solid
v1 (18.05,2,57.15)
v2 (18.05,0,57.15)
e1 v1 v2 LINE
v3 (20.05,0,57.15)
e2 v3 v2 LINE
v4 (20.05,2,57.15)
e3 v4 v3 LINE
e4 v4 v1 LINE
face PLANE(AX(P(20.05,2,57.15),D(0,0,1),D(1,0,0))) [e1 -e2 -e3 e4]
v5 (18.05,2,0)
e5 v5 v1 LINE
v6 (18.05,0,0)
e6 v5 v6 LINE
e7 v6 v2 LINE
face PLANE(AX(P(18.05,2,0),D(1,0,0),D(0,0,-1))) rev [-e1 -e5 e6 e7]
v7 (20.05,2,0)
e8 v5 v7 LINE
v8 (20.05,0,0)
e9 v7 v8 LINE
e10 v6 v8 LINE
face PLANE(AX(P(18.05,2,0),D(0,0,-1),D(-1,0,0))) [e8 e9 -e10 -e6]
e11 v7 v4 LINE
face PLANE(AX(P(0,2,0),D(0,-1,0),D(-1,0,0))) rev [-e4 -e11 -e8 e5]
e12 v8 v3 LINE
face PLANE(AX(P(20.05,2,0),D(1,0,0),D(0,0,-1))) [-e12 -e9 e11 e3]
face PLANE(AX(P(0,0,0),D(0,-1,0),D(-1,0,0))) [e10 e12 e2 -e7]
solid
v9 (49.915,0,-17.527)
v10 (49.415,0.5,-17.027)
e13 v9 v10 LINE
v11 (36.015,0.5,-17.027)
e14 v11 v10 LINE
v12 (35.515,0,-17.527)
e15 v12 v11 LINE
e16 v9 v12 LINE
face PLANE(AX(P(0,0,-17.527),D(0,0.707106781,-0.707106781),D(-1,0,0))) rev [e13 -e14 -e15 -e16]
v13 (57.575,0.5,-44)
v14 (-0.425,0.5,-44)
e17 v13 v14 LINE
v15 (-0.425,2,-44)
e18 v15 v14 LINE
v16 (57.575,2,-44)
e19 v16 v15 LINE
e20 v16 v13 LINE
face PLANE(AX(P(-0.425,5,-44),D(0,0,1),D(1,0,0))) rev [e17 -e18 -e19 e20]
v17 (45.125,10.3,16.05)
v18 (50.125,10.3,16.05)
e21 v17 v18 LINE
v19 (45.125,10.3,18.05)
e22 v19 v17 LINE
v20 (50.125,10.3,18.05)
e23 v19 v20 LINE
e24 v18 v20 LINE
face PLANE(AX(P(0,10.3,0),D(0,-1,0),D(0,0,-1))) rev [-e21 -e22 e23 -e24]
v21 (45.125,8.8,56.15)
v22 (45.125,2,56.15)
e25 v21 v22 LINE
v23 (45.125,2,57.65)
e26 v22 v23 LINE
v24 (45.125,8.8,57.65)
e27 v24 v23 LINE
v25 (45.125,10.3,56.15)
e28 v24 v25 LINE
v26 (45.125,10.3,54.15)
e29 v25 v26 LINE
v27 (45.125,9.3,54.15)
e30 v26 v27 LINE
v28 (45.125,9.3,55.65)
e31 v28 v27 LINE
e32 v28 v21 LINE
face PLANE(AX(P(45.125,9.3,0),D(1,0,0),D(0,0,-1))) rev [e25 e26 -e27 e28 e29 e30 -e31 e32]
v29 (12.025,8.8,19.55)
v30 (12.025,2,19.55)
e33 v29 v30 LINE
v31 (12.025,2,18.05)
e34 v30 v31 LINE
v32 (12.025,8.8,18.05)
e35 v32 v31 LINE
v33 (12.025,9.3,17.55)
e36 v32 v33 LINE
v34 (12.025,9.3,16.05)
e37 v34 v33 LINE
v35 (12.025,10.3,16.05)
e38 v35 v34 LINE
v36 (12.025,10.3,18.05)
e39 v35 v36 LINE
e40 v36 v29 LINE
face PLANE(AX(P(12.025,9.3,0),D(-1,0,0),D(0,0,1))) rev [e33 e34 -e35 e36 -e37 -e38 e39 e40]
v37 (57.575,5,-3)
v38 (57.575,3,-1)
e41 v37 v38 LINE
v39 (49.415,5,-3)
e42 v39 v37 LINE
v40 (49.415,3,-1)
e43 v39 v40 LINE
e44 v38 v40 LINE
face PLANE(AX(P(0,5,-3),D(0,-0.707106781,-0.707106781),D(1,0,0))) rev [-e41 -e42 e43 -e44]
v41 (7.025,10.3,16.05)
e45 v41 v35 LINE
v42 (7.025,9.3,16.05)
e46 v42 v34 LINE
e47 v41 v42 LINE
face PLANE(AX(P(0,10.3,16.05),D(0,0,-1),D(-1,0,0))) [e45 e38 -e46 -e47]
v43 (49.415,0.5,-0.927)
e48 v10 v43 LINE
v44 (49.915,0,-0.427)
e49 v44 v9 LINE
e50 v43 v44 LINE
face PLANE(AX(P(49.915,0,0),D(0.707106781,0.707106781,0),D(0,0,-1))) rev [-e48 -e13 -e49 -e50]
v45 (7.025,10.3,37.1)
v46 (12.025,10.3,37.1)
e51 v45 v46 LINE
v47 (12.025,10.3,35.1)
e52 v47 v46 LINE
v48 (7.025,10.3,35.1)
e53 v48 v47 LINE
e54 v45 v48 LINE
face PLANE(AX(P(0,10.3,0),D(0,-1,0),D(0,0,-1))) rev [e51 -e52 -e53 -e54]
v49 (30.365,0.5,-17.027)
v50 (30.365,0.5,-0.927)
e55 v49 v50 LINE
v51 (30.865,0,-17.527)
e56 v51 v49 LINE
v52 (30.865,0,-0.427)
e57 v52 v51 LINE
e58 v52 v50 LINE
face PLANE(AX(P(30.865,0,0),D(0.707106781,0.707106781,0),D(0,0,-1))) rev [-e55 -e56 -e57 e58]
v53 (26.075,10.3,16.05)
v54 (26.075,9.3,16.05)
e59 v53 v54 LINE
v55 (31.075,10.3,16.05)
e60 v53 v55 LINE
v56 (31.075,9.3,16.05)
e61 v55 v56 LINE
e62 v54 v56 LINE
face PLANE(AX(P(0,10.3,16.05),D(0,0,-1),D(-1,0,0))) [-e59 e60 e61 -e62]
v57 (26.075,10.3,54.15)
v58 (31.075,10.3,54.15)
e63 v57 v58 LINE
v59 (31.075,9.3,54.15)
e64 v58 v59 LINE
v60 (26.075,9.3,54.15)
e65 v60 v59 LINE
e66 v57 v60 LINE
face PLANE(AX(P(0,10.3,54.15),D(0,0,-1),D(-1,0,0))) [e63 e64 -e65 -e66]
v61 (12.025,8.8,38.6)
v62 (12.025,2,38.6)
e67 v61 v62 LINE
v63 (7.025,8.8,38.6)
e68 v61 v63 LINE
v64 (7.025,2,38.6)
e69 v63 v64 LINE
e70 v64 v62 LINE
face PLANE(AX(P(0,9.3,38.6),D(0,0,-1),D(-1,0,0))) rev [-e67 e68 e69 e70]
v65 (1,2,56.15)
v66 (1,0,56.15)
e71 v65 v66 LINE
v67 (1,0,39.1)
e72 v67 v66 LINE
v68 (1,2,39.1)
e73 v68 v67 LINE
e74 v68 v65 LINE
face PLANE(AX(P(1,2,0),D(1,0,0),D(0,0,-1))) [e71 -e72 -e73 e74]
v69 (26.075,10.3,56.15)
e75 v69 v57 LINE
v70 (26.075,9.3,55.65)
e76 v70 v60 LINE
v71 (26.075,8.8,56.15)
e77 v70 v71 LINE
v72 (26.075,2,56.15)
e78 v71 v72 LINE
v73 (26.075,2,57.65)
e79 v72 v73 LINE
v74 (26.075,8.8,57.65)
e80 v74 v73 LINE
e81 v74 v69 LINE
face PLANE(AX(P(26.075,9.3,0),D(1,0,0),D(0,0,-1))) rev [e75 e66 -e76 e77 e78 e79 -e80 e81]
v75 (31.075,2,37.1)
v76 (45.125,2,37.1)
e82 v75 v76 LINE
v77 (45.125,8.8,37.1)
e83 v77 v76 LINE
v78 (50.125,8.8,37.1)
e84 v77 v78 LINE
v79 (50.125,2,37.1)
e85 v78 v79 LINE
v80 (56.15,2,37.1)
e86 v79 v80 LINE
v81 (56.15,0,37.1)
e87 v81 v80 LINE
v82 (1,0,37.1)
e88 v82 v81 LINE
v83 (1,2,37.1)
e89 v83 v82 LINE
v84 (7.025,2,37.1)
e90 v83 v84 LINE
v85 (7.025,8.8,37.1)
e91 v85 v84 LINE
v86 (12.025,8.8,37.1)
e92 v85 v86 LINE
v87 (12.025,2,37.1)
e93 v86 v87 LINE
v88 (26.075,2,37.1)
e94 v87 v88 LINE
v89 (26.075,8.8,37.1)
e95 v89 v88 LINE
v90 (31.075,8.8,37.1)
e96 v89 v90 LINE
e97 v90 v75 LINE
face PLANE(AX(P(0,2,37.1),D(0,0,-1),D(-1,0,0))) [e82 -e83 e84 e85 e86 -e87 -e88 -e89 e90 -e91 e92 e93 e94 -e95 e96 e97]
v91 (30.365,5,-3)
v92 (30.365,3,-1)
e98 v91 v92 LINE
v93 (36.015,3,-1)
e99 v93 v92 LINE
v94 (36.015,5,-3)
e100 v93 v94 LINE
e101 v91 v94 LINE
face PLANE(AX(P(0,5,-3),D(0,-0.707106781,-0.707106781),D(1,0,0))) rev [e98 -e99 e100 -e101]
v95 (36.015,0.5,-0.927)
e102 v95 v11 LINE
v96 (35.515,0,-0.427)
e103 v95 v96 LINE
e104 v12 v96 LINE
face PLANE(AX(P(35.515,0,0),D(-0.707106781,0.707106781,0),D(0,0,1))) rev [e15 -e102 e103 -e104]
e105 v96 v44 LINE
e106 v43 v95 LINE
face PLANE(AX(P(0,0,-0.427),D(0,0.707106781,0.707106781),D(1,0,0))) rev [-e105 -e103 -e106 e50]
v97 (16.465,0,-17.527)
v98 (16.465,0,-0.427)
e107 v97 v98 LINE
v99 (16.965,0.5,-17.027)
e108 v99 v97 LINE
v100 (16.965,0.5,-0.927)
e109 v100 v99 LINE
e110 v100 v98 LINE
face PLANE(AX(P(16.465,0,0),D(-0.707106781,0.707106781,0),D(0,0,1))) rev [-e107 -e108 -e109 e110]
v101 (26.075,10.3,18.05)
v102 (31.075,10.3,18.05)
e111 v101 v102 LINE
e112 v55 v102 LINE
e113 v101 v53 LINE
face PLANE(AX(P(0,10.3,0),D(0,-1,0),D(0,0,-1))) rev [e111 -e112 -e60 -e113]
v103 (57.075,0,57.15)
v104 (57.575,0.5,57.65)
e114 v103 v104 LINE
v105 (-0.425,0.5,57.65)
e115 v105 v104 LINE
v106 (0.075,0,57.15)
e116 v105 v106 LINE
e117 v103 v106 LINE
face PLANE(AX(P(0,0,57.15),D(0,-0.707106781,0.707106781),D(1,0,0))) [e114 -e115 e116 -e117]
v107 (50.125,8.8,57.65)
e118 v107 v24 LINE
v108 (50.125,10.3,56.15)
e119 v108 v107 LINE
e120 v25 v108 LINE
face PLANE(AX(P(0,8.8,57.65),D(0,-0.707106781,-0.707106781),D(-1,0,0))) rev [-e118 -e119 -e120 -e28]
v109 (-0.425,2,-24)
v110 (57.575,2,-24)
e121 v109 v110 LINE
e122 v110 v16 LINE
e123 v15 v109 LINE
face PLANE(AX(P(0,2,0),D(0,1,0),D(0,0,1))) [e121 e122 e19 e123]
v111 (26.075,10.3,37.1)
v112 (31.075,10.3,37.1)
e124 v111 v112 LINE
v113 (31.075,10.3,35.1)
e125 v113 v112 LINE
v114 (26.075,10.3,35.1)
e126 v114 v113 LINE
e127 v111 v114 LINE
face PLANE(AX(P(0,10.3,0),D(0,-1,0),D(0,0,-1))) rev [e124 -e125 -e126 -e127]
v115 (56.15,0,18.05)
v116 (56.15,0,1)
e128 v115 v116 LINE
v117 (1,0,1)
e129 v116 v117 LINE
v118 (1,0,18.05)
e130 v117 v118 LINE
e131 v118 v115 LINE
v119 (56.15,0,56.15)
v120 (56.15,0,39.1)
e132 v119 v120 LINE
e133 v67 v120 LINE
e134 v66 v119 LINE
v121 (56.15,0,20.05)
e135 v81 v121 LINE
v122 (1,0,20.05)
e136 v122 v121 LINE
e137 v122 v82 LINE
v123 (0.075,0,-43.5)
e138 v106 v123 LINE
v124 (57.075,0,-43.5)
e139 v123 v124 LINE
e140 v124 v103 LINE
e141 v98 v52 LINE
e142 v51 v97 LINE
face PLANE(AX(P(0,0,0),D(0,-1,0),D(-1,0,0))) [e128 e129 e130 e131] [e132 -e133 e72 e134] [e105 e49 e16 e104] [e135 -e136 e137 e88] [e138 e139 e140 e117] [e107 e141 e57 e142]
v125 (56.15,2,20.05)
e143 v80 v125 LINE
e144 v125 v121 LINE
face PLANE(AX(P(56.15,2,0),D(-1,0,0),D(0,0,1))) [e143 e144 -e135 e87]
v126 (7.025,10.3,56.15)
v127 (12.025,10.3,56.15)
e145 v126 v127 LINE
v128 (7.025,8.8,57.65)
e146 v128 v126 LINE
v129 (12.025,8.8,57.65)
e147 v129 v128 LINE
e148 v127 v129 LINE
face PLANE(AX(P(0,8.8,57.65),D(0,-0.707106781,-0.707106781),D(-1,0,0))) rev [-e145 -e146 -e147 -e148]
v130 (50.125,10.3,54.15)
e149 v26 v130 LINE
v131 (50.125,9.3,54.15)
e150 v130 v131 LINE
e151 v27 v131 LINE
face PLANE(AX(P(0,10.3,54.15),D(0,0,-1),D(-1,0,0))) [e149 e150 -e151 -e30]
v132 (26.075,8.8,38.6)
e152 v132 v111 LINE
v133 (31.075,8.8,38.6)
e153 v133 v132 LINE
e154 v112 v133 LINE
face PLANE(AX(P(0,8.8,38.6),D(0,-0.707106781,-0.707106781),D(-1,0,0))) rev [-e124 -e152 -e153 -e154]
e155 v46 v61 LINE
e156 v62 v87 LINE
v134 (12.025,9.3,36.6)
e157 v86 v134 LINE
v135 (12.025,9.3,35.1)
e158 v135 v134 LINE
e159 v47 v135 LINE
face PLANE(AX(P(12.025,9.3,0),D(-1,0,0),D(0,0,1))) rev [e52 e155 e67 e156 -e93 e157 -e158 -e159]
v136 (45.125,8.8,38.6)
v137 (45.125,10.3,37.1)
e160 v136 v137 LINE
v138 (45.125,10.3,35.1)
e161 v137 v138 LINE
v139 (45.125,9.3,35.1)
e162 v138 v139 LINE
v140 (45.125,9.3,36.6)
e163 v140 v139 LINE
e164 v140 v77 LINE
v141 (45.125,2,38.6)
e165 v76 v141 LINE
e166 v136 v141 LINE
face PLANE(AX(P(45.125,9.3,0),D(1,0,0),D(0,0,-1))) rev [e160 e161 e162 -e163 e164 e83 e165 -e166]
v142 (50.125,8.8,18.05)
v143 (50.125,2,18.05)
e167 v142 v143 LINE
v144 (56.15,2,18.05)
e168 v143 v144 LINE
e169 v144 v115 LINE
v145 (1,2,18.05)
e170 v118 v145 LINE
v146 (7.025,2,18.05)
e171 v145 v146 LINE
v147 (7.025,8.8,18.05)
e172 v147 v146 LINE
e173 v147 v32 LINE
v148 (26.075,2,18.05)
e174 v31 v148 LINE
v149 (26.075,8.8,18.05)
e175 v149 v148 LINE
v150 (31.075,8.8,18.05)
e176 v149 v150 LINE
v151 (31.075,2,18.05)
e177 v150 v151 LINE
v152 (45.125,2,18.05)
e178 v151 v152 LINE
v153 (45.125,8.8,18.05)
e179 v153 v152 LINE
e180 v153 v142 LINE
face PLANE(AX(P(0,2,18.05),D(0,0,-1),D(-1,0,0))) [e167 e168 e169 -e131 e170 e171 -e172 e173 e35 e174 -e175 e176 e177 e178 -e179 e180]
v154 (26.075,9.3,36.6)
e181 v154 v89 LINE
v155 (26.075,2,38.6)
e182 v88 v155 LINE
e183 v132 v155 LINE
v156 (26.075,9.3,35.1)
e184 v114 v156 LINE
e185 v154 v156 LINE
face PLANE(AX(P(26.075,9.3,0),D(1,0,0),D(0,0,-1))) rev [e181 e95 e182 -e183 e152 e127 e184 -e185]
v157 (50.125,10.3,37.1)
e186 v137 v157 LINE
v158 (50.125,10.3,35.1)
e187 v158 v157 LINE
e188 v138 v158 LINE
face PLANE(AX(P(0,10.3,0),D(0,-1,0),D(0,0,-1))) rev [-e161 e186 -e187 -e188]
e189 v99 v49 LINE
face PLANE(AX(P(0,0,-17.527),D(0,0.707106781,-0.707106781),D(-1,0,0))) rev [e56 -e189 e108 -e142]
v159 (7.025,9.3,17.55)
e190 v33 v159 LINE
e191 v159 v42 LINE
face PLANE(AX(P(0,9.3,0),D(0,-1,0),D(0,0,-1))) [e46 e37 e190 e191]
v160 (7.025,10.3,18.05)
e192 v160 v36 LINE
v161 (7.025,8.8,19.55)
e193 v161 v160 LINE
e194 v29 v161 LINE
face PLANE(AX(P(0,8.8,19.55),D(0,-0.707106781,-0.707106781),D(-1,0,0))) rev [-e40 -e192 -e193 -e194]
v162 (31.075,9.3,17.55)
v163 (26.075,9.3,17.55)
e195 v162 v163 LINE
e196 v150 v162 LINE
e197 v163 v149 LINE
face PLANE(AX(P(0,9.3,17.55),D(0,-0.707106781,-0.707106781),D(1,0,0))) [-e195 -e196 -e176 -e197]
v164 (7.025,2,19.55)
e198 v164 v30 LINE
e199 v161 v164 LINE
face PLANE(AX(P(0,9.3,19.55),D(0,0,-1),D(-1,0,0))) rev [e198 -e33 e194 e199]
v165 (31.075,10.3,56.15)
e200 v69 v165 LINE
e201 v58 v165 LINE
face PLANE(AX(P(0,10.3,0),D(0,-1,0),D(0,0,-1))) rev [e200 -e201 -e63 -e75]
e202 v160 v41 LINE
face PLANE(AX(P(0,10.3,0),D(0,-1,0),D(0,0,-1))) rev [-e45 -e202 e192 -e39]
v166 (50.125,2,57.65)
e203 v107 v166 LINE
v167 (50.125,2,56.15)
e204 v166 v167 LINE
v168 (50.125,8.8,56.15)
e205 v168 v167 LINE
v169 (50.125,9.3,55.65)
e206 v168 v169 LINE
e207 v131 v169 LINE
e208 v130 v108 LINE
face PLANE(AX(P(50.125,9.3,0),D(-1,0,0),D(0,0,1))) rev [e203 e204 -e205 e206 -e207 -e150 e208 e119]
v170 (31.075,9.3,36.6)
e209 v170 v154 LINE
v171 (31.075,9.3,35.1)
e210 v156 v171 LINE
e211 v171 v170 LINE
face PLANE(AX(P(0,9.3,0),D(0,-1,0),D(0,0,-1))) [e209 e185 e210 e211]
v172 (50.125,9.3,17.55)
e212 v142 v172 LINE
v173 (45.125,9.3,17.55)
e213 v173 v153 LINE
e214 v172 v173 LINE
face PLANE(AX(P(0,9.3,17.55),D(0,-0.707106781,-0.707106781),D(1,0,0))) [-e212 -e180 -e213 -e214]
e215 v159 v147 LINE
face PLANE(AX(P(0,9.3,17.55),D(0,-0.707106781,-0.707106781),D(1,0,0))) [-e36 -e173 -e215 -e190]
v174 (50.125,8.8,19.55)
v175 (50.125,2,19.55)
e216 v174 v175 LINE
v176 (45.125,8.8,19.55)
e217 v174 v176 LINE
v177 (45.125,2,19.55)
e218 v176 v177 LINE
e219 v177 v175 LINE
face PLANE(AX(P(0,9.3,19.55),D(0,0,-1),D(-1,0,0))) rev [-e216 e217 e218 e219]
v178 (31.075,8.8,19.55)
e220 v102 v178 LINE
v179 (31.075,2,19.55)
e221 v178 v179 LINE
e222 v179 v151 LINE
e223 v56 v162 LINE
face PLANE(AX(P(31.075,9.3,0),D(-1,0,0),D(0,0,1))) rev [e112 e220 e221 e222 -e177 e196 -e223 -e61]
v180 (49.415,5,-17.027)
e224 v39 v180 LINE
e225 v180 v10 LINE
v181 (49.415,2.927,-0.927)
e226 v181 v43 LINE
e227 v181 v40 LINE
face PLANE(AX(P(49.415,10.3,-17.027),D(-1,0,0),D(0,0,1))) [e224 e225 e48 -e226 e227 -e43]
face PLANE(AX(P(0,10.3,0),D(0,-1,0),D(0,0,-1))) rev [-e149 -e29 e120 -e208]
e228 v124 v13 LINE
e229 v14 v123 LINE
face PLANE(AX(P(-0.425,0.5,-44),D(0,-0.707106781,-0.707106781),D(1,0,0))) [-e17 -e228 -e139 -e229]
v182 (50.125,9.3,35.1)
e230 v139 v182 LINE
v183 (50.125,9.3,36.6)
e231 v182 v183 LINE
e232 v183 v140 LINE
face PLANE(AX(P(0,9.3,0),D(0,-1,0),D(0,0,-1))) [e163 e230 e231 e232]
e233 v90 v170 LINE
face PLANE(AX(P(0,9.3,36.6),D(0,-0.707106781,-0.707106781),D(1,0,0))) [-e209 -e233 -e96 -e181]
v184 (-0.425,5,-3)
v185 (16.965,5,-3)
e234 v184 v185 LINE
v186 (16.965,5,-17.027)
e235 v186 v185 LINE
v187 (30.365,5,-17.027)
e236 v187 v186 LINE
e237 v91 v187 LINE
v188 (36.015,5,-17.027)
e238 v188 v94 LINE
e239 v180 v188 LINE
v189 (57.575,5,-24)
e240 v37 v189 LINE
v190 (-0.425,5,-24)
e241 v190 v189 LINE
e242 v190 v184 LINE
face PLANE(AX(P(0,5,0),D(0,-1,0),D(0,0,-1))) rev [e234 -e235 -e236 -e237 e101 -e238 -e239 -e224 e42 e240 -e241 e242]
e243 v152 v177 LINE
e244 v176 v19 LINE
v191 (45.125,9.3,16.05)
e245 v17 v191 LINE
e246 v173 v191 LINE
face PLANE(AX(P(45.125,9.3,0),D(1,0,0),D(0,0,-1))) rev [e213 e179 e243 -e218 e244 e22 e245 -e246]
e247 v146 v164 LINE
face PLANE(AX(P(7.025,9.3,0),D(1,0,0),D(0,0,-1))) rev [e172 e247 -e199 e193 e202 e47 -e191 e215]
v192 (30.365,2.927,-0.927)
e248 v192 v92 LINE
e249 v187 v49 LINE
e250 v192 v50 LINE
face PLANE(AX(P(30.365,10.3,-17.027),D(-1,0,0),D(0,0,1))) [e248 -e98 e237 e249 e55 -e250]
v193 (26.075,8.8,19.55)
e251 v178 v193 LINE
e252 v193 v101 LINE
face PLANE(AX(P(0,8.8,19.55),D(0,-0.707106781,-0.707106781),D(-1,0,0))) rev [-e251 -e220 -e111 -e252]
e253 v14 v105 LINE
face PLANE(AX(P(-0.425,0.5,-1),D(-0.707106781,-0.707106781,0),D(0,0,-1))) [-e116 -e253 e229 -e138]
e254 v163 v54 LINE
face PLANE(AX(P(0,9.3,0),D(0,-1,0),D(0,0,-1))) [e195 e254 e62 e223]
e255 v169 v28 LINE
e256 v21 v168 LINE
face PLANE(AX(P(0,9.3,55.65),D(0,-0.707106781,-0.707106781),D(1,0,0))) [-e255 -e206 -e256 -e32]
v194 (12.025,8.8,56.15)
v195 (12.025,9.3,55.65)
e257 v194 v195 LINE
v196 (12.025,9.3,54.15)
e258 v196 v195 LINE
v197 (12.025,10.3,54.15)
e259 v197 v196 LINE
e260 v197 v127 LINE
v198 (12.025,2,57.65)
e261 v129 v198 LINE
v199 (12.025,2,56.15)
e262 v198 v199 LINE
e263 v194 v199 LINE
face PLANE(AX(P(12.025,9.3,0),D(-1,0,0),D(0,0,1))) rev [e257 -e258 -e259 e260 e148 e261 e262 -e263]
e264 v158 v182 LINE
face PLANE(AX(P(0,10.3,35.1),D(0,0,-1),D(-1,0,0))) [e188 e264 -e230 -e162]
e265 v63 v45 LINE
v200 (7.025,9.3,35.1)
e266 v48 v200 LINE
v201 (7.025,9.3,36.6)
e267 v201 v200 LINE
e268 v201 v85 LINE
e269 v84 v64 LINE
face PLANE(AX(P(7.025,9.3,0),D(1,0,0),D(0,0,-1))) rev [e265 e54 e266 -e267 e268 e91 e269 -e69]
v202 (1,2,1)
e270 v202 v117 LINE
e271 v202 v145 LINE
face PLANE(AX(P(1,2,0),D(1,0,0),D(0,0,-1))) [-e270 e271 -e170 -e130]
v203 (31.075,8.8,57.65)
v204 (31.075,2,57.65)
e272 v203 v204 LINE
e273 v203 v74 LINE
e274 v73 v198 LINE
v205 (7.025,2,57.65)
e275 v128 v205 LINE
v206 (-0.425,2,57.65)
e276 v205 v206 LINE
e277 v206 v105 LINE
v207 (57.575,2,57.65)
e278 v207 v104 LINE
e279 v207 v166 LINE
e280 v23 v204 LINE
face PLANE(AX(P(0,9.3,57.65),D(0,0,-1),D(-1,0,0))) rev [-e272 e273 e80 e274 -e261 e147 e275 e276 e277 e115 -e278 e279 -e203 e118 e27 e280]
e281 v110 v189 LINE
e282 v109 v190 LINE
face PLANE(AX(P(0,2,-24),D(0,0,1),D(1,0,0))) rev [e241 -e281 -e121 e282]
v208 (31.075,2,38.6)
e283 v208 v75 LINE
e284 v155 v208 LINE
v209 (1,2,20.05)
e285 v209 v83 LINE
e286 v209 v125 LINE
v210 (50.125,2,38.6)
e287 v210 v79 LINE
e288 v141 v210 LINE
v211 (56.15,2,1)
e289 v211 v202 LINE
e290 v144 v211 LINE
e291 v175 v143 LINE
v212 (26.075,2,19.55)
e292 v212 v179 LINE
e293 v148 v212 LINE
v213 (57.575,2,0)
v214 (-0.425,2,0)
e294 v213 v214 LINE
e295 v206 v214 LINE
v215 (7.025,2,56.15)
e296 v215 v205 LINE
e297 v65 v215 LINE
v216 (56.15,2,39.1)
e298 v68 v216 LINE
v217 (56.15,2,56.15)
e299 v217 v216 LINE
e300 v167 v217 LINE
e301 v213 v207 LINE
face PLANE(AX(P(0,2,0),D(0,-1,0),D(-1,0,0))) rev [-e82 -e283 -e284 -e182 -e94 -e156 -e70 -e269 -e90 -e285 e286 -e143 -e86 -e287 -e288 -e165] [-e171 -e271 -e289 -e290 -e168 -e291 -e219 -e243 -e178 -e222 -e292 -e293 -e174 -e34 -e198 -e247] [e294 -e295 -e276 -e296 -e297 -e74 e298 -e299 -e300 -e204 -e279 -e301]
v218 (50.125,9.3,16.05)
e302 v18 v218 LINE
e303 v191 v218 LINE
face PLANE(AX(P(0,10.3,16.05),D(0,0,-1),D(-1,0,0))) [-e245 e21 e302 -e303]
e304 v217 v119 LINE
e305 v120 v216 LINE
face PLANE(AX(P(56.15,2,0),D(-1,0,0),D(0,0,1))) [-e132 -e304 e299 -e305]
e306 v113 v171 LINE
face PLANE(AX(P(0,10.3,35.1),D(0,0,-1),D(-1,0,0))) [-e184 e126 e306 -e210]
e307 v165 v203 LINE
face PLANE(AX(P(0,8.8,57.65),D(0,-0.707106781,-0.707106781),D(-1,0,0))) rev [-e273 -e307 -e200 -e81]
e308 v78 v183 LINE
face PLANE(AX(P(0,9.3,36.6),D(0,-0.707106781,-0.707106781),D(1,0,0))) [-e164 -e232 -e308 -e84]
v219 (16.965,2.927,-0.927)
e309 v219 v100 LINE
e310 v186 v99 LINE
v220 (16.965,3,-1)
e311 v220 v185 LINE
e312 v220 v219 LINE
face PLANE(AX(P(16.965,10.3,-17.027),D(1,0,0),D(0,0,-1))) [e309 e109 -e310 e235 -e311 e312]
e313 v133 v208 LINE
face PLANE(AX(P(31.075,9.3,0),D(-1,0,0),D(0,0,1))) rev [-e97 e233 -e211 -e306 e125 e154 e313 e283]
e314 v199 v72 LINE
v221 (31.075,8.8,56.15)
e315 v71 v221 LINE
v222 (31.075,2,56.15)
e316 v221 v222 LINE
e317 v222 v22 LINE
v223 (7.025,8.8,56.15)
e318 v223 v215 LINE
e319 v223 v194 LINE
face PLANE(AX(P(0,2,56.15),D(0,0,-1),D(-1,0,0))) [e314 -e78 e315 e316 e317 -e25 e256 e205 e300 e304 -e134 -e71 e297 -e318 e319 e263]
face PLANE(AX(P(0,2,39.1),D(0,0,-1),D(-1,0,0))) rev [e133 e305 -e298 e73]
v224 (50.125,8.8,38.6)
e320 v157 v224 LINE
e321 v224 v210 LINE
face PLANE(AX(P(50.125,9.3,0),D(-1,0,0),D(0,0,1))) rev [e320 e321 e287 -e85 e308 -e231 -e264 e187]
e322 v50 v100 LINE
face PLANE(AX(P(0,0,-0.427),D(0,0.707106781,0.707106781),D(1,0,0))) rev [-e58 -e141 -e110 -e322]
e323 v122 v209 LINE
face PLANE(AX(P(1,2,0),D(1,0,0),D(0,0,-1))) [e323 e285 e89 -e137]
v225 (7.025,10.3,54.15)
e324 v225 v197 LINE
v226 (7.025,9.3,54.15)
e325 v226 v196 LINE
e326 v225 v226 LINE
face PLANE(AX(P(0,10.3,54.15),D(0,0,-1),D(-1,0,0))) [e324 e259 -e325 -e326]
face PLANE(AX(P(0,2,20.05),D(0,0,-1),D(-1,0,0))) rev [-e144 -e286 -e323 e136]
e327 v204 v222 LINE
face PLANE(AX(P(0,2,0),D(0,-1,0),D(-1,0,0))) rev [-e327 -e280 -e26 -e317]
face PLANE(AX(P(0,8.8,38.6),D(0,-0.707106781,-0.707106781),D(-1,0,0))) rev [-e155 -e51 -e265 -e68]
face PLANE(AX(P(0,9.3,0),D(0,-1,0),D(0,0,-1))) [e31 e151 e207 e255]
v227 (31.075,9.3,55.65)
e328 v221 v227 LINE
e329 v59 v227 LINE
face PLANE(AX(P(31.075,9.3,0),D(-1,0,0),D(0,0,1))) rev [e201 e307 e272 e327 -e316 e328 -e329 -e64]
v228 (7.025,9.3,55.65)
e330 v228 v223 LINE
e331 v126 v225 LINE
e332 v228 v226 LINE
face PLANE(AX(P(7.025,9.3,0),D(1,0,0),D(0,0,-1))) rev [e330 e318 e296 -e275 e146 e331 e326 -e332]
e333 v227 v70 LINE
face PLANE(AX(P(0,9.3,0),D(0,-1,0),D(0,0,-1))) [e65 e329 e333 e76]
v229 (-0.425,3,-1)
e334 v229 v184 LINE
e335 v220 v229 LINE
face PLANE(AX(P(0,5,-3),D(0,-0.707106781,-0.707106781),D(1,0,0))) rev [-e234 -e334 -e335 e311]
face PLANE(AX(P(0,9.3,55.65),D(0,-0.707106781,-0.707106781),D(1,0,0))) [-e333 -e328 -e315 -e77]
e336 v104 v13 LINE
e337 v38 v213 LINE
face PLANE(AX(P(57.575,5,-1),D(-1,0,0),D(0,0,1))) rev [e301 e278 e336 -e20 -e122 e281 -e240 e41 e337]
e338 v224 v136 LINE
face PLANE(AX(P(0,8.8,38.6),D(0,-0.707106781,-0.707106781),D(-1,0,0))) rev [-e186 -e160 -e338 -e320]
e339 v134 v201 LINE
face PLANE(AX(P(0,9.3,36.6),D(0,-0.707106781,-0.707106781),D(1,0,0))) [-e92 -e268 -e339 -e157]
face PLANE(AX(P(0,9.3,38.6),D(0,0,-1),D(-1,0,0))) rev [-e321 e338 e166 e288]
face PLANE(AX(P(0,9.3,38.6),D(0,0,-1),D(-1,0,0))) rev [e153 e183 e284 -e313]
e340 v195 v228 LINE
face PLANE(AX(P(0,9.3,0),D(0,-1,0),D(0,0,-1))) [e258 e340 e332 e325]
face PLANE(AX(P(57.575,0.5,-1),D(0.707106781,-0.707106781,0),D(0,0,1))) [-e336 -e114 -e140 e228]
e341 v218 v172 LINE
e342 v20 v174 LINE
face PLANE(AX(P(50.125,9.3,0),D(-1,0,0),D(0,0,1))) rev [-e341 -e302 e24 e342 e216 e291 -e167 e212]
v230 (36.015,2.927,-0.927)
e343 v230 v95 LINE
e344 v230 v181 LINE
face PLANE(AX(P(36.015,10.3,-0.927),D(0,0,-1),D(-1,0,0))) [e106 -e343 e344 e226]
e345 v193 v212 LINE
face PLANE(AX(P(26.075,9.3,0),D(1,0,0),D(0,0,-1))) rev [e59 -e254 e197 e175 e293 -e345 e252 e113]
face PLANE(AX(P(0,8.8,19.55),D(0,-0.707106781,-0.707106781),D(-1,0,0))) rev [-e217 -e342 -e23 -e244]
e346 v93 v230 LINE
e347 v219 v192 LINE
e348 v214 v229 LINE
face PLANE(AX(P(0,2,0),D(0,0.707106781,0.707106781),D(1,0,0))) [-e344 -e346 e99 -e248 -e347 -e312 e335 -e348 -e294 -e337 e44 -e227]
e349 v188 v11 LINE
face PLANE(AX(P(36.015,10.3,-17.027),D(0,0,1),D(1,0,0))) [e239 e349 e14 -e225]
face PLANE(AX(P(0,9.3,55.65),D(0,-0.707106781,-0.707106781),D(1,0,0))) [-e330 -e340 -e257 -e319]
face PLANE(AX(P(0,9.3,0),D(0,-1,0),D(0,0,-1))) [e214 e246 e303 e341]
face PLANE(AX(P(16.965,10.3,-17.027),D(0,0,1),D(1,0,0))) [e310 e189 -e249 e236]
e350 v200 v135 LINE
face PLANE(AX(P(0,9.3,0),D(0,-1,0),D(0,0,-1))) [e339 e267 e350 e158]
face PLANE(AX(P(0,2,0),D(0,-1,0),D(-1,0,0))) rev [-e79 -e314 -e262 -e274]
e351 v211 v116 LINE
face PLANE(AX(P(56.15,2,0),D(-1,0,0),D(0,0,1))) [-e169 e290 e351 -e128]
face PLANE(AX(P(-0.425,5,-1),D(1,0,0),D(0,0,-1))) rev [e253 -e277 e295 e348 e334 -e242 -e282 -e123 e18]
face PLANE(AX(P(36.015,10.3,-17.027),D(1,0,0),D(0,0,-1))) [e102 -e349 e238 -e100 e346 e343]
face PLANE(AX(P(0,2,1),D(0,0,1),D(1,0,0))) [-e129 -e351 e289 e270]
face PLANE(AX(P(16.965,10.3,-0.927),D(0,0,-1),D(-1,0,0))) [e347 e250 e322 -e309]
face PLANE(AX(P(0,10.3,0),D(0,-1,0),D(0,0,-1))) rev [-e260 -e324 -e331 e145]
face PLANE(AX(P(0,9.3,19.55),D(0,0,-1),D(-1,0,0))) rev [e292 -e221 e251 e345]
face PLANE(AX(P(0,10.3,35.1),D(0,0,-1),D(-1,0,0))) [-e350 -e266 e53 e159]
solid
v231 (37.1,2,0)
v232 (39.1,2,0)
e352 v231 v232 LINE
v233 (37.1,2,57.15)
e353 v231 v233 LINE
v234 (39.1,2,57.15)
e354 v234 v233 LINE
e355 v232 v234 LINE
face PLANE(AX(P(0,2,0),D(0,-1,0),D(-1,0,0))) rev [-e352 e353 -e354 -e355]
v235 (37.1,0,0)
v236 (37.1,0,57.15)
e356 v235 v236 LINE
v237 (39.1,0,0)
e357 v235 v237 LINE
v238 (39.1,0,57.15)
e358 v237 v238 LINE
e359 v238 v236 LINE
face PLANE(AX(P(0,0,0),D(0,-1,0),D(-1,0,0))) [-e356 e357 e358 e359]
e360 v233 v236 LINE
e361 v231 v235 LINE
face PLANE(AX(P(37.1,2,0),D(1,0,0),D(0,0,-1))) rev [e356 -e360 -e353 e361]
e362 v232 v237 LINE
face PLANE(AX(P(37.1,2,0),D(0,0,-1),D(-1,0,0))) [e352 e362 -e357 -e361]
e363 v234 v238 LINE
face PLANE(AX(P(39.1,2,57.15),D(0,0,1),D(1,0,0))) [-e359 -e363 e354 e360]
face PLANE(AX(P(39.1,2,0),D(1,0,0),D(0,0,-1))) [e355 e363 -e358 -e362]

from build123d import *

# Parameters (mm, degrees)
SKETCH1_W             = 2
SKETCH1_H             = 57.15
EXTRUDE_THIN1_DEPTH   = 2
SKETCH1_W_2           = 59.15
SKETCH1_H_2           = 59.15
SKETCH1_W_3           = 55.15
SKETCH1_H_3           = 55.15
EXTRUDE_THIN1_2_DEPTH = 2
EXTRUDE_THIN1_3_DEPTH = 2
SKETCH1_W_4           = 57.15
SKETCH1_H_4           = 2
EXTRUDE_THIN1_4_DEPTH = 2
EXTRUDE_THIN1_5_DEPTH = 2
BOSS_EXTRUDE1_START   = 2
SKETCH2_W             = 5
SKETCH2_H             = 1.5
BOSS_EXTRUDE1_DEPTH   = 7.3
BOSS_EXTRUDE2_START   = 9.3
SKETCH3_W             = 5
SKETCH3_H             = 3.5
BOSS_EXTRUDE2_DEPTH   = 1
CHAMFER1_SIZE         = 0.5
CHAMFER2_SIZE         = 1.5
SKETCH4_W             = 58
SKETCH4_H             = 43
BOSS_EXTRUDE3_DEPTH   = 5
CHAMFER3_SIZE         = 2
SKETCH5_W             = 13.4
SKETCH5_H             = 16.1
CUT_EXTRUDE1_DEPTH    = 83.879038363
CHAMFER4_START        = -0.425
CHAMFER4_DEPTH        = 58.575
CHAMFER4_2_DEPTH      = 17.39
CHAMFER4_START_2      = 49.415
CHAMFER4_3_DEPTH      = 8.735
CHAMFER4_START_3      = 30.365
CHAMFER4_4_DEPTH      = 5.65
CUT_EXTRUDE2_START    = 5
SKETCH6_W             = 58
SKETCH6_H             = 20
CUT_EXTRUDE2_DEPTH    = 3
CUT_EXTRUDE3_DEPTH    = 83.879038363
CHAMFER5_SIZE         = 0.5


with BuildPart() as part:
    # Sketch1 → Extrude-Thin1 (new body)
    with BuildSketch(Plane(origin=(0, 0, 0), x_dir=(1, 0, 0), z_dir=(0, 1, 0))):
        with Locations((38.1, -28.575)):
            Rectangle(SKETCH1_W, SKETCH1_H)
    extrude(amount=EXTRUDE_THIN1_DEPTH)


with BuildPart() as body_2:
    # Sketch1 → Extrude-Thin1 2 (new body)
    with BuildSketch(Plane(origin=(0, 0, 0), x_dir=(1, 0, 0), z_dir=(0, 1, 0))):
        with Locations((28.575, -28.575)):
            Rectangle(SKETCH1_W_2, SKETCH1_H_2)
        with Locations((28.575, -28.575)):
            Rectangle(SKETCH1_W_3, SKETCH1_H_3, mode=Mode.SUBTRACT)
    extrude(amount=EXTRUDE_THIN1_2_DEPTH)



with BuildPart() as body_3:
    # Sketch1 → Extrude-Thin1 3 (new body)
    with BuildSketch(Plane(origin=(0, 0, 0), x_dir=(1, 0, 0), z_dir=(0, 1, 0))):
        with Locations((19.05, -28.575)):
            Rectangle(SKETCH1_W, SKETCH1_H)
    extrude(amount=EXTRUDE_THIN1_3_DEPTH)


with BuildPart() as body_4:
    # Sketch1 → Extrude-Thin1 4 (new body)
    with BuildSketch(Plane(origin=(0, 0, 0), x_dir=(1, 0, 0), z_dir=(0, 1, 0))):
        with Locations((28.575, -38.1)):
            Rectangle(SKETCH1_W_4, SKETCH1_H_4)
    extrude(amount=EXTRUDE_THIN1_4_DEPTH)


with BuildPart() as body_5:
    # Sketch1 → Extrude-Thin1 5 (new body)
    with BuildSketch(Plane(origin=(0, 0, 0), x_dir=(1, 0, 0), z_dir=(0, 1, 0))):
        with Locations((28.575, -19.05)):
            Rectangle(SKETCH1_W_4, SKETCH1_H_4)
    extrude(amount=EXTRUDE_THIN1_5_DEPTH)


with BuildPart() as body_2_1:
    add(body_2.part)

    add(body_4.part)  # Boss-Extrude1 merges body 4

    add(body_5.part)  # Boss-Extrude1 merges body 5
    # Sketch2 → Boss-Extrude1 (add)
    with BuildSketch(Plane(origin=(0, 0, 0), x_dir=(1, 0, 0), z_dir=(0, 1, 0)).offset(BOSS_EXTRUDE1_START)):
        with Locations((28.575, -56.9)):
            Rectangle(SKETCH2_W, SKETCH2_H)
        with Locations((9.525, -56.9)):
            Rectangle(SKETCH2_W, SKETCH2_H)
        with Locations((47.625, -56.9)):
            Rectangle(SKETCH2_W, SKETCH2_H)
        with Locations((28.575, -37.85)):
            Rectangle(SKETCH2_W, SKETCH2_H)
        with Locations((47.625, -37.85)):
            Rectangle(SKETCH2_W, SKETCH2_H)
        with Locations((28.575, -18.8)):
            Rectangle(SKETCH2_W, SKETCH2_H)
        with Locations((47.625, -18.8)):
            Rectangle(SKETCH2_W, SKETCH2_H)
        with Locations((9.525, -37.85)):
            Rectangle(SKETCH2_W, SKETCH2_H)
        with Locations((9.525, -18.8)):
            Rectangle(SKETCH2_W, SKETCH2_H)
    extrude(amount=BOSS_EXTRUDE1_DEPTH)

    # Sketch3 → Boss-Extrude2 (add)
    with BuildSketch(Plane(origin=(0, 0, 0), x_dir=(1, 0, 0), z_dir=(0, 1, 0)).offset(BOSS_EXTRUDE2_START)):
        with Locations((28.575, -55.9)):
            Rectangle(SKETCH3_W, SKETCH3_H)
        with Locations((9.525, -55.9)):
            Rectangle(SKETCH3_W, SKETCH3_H)
        with Locations((47.625, -55.9)):
            Rectangle(SKETCH3_W, SKETCH3_H)
        with Locations((28.575, -36.85)):
            Rectangle(SKETCH3_W, SKETCH3_H)
        with Locations((47.625, -36.85)):
            Rectangle(SKETCH3_W, SKETCH3_H)
        with Locations((28.575, -17.8)):
            Rectangle(SKETCH3_W, SKETCH3_H)
        with Locations((47.625, -17.8)):
            Rectangle(SKETCH3_W, SKETCH3_H)
        with Locations((9.525, -36.85)):
            Rectangle(SKETCH3_W, SKETCH3_H)
        with Locations((9.525, -17.8)):
            Rectangle(SKETCH3_W, SKETCH3_H)
    extrude(amount=BOSS_EXTRUDE2_DEPTH)

    # Chamfer1
    chamfer1_edges = [body_2_1.edges().sort_by_distance(p)[0] for p in [
        (28.575, 9.3, 56.15),
        (47.625, 9.3, 56.15),
        (47.625, 9.3, 37.1),
        (28.575, 9.3, 18.05),
        (47.625, 9.3, 18.05),
        (9.525, 9.3, 37.1),
        (28.575, 9.3, 37.1),
        (9.525, 9.3, 18.05),
        (9.525, 9.3, 56.15),
    ]]
    chamfer(chamfer1_edges, length=CHAMFER1_SIZE)

    # Chamfer2
    chamfer2_edges = [body_2_1.edges().sort_by_distance(p)[0] for p in [
        (28.575, 10.3, 57.65),
        (47.625, 10.3, 57.65),
        (28.575, 10.3, 38.6),
        (47.625, 10.3, 38.6),
        (28.575, 10.3, 19.55),
        (47.625, 10.3, 19.55),
        (9.525, 10.3, 38.6),
        (9.525, 10.3, 19.55),
        (9.525, 10.3, 57.65),
    ]]
    chamfer(chamfer2_edges, length=CHAMFER2_SIZE)

    # Sketch4 → Boss-Extrude3 (add)
    with BuildSketch(Plane(origin=(0, 0, 0), x_dir=(1, 0, 0), z_dir=(0, 1, 0))):
        with Locations((28.575, 22.5)):
            Rectangle(SKETCH4_W, SKETCH4_H)
    extrude(amount=BOSS_EXTRUDE3_DEPTH)

    # Chamfer3
    chamfer3_edges = [body_2_1.edges().sort_by_distance(p)[0] for p in [
        (28.575, 5, -1),
    ]]
    chamfer(chamfer3_edges, length=CHAMFER3_SIZE)

    # Sketch5 → Cut-Extrude1 (cut, through all)
    with BuildSketch(Plane(origin=(0, 0, 0), x_dir=(1, 0, 0), z_dir=(0, 1, 0))):
        with Locations((23.665, 8.977)):
            Rectangle(SKETCH5_W, SKETCH5_H)
        with Locations((42.715, 8.977)):
            Rectangle(SKETCH5_W, SKETCH5_H)
    extrude(amount=CUT_EXTRUDE1_DEPTH, mode=Mode.SUBTRACT)

    # Chamfer4: read off the stored shape, not the designer's step
    # Chamfer4 outline → Chamfer4 (add)
    with BuildSketch(Plane.YZ.offset(CHAMFER4_START)):
        Polygon((2, -0.927), (2.927, -0.927), (2, 0), align=None)
    extrude(amount=CHAMFER4_DEPTH)

    # Chamfer4 2 outline → Chamfer4 2 (add)
    with BuildSketch(Plane.YZ.offset(CHAMFER4_START)):
        Polygon((2, -1), (3, -1), (2.927, -0.927), (2, -0.927), align=None)
    extrude(amount=CHAMFER4_2_DEPTH)

    # Chamfer4 3 outline → Chamfer4 3 (add)
    with BuildSketch(Plane.YZ.offset(CHAMFER4_START_2)):
        Polygon((2, -1), (3, -1), (2.927, -0.927), (2, -0.927), align=None)
    extrude(amount=CHAMFER4_3_DEPTH)

    # Chamfer4 4 outline → Chamfer4 4 (add)
    with BuildSketch(Plane.YZ.offset(CHAMFER4_START_3)):
        Polygon((2, -1), (3, -1), (2.927, -0.927), (2, -0.927), align=None)
    extrude(amount=CHAMFER4_4_DEPTH)

    # Sketch6 → Cut-Extrude2 (cut)
    with BuildSketch(Plane(origin=(0, 0, 0), x_dir=(1, 0, 0), z_dir=(0, 1, 0)).offset(CUT_EXTRUDE2_START)):
        with Locations((28.575, 34)):
            Rectangle(SKETCH6_W, SKETCH6_H)
    extrude(amount=-CUT_EXTRUDE2_DEPTH, mode=Mode.SUBTRACT)

    # Sketch7 → Cut-Extrude3 (cut, through all)
    with BuildSketch(Plane(origin=(0, 0, 0), x_dir=(1, 0, 0), z_dir=(0, 1, 0))):
        Polygon((57.575, 1), (58.15, 1), (58.15, 0), (58.15, -58.15), (-1, -58.15), (-1, 1), (-0.425, 1), (-0.425, -57.65), (57.575, -57.65), align=None)
    extrude(amount=CUT_EXTRUDE3_DEPTH, mode=Mode.SUBTRACT)

    # Chamfer5
    chamfer5_edges = [body_2_1.edges().sort_by_distance(p)[0] for p in [
        (-0.425, 0, 6.825),
        (57.575, 0, 6.825),
        (28.575, 0, -44),
        (23.665, 0, -0.927),
        (23.665, 0, -17.027),
        (16.965, 0, -8.977),
        (30.365, 0, -8.977),
        (42.715, 0, -0.927),
        (42.715, 0, -17.027),
        (36.015, 0, -8.977),
        (49.415, 0, -8.977),
        (28.575, 0, 57.65),
    ]]
    chamfer(chamfer5_edges, length=CHAMFER5_SIZE)


solid = Compound([part.part, body_3.part, body_2_1.part])
